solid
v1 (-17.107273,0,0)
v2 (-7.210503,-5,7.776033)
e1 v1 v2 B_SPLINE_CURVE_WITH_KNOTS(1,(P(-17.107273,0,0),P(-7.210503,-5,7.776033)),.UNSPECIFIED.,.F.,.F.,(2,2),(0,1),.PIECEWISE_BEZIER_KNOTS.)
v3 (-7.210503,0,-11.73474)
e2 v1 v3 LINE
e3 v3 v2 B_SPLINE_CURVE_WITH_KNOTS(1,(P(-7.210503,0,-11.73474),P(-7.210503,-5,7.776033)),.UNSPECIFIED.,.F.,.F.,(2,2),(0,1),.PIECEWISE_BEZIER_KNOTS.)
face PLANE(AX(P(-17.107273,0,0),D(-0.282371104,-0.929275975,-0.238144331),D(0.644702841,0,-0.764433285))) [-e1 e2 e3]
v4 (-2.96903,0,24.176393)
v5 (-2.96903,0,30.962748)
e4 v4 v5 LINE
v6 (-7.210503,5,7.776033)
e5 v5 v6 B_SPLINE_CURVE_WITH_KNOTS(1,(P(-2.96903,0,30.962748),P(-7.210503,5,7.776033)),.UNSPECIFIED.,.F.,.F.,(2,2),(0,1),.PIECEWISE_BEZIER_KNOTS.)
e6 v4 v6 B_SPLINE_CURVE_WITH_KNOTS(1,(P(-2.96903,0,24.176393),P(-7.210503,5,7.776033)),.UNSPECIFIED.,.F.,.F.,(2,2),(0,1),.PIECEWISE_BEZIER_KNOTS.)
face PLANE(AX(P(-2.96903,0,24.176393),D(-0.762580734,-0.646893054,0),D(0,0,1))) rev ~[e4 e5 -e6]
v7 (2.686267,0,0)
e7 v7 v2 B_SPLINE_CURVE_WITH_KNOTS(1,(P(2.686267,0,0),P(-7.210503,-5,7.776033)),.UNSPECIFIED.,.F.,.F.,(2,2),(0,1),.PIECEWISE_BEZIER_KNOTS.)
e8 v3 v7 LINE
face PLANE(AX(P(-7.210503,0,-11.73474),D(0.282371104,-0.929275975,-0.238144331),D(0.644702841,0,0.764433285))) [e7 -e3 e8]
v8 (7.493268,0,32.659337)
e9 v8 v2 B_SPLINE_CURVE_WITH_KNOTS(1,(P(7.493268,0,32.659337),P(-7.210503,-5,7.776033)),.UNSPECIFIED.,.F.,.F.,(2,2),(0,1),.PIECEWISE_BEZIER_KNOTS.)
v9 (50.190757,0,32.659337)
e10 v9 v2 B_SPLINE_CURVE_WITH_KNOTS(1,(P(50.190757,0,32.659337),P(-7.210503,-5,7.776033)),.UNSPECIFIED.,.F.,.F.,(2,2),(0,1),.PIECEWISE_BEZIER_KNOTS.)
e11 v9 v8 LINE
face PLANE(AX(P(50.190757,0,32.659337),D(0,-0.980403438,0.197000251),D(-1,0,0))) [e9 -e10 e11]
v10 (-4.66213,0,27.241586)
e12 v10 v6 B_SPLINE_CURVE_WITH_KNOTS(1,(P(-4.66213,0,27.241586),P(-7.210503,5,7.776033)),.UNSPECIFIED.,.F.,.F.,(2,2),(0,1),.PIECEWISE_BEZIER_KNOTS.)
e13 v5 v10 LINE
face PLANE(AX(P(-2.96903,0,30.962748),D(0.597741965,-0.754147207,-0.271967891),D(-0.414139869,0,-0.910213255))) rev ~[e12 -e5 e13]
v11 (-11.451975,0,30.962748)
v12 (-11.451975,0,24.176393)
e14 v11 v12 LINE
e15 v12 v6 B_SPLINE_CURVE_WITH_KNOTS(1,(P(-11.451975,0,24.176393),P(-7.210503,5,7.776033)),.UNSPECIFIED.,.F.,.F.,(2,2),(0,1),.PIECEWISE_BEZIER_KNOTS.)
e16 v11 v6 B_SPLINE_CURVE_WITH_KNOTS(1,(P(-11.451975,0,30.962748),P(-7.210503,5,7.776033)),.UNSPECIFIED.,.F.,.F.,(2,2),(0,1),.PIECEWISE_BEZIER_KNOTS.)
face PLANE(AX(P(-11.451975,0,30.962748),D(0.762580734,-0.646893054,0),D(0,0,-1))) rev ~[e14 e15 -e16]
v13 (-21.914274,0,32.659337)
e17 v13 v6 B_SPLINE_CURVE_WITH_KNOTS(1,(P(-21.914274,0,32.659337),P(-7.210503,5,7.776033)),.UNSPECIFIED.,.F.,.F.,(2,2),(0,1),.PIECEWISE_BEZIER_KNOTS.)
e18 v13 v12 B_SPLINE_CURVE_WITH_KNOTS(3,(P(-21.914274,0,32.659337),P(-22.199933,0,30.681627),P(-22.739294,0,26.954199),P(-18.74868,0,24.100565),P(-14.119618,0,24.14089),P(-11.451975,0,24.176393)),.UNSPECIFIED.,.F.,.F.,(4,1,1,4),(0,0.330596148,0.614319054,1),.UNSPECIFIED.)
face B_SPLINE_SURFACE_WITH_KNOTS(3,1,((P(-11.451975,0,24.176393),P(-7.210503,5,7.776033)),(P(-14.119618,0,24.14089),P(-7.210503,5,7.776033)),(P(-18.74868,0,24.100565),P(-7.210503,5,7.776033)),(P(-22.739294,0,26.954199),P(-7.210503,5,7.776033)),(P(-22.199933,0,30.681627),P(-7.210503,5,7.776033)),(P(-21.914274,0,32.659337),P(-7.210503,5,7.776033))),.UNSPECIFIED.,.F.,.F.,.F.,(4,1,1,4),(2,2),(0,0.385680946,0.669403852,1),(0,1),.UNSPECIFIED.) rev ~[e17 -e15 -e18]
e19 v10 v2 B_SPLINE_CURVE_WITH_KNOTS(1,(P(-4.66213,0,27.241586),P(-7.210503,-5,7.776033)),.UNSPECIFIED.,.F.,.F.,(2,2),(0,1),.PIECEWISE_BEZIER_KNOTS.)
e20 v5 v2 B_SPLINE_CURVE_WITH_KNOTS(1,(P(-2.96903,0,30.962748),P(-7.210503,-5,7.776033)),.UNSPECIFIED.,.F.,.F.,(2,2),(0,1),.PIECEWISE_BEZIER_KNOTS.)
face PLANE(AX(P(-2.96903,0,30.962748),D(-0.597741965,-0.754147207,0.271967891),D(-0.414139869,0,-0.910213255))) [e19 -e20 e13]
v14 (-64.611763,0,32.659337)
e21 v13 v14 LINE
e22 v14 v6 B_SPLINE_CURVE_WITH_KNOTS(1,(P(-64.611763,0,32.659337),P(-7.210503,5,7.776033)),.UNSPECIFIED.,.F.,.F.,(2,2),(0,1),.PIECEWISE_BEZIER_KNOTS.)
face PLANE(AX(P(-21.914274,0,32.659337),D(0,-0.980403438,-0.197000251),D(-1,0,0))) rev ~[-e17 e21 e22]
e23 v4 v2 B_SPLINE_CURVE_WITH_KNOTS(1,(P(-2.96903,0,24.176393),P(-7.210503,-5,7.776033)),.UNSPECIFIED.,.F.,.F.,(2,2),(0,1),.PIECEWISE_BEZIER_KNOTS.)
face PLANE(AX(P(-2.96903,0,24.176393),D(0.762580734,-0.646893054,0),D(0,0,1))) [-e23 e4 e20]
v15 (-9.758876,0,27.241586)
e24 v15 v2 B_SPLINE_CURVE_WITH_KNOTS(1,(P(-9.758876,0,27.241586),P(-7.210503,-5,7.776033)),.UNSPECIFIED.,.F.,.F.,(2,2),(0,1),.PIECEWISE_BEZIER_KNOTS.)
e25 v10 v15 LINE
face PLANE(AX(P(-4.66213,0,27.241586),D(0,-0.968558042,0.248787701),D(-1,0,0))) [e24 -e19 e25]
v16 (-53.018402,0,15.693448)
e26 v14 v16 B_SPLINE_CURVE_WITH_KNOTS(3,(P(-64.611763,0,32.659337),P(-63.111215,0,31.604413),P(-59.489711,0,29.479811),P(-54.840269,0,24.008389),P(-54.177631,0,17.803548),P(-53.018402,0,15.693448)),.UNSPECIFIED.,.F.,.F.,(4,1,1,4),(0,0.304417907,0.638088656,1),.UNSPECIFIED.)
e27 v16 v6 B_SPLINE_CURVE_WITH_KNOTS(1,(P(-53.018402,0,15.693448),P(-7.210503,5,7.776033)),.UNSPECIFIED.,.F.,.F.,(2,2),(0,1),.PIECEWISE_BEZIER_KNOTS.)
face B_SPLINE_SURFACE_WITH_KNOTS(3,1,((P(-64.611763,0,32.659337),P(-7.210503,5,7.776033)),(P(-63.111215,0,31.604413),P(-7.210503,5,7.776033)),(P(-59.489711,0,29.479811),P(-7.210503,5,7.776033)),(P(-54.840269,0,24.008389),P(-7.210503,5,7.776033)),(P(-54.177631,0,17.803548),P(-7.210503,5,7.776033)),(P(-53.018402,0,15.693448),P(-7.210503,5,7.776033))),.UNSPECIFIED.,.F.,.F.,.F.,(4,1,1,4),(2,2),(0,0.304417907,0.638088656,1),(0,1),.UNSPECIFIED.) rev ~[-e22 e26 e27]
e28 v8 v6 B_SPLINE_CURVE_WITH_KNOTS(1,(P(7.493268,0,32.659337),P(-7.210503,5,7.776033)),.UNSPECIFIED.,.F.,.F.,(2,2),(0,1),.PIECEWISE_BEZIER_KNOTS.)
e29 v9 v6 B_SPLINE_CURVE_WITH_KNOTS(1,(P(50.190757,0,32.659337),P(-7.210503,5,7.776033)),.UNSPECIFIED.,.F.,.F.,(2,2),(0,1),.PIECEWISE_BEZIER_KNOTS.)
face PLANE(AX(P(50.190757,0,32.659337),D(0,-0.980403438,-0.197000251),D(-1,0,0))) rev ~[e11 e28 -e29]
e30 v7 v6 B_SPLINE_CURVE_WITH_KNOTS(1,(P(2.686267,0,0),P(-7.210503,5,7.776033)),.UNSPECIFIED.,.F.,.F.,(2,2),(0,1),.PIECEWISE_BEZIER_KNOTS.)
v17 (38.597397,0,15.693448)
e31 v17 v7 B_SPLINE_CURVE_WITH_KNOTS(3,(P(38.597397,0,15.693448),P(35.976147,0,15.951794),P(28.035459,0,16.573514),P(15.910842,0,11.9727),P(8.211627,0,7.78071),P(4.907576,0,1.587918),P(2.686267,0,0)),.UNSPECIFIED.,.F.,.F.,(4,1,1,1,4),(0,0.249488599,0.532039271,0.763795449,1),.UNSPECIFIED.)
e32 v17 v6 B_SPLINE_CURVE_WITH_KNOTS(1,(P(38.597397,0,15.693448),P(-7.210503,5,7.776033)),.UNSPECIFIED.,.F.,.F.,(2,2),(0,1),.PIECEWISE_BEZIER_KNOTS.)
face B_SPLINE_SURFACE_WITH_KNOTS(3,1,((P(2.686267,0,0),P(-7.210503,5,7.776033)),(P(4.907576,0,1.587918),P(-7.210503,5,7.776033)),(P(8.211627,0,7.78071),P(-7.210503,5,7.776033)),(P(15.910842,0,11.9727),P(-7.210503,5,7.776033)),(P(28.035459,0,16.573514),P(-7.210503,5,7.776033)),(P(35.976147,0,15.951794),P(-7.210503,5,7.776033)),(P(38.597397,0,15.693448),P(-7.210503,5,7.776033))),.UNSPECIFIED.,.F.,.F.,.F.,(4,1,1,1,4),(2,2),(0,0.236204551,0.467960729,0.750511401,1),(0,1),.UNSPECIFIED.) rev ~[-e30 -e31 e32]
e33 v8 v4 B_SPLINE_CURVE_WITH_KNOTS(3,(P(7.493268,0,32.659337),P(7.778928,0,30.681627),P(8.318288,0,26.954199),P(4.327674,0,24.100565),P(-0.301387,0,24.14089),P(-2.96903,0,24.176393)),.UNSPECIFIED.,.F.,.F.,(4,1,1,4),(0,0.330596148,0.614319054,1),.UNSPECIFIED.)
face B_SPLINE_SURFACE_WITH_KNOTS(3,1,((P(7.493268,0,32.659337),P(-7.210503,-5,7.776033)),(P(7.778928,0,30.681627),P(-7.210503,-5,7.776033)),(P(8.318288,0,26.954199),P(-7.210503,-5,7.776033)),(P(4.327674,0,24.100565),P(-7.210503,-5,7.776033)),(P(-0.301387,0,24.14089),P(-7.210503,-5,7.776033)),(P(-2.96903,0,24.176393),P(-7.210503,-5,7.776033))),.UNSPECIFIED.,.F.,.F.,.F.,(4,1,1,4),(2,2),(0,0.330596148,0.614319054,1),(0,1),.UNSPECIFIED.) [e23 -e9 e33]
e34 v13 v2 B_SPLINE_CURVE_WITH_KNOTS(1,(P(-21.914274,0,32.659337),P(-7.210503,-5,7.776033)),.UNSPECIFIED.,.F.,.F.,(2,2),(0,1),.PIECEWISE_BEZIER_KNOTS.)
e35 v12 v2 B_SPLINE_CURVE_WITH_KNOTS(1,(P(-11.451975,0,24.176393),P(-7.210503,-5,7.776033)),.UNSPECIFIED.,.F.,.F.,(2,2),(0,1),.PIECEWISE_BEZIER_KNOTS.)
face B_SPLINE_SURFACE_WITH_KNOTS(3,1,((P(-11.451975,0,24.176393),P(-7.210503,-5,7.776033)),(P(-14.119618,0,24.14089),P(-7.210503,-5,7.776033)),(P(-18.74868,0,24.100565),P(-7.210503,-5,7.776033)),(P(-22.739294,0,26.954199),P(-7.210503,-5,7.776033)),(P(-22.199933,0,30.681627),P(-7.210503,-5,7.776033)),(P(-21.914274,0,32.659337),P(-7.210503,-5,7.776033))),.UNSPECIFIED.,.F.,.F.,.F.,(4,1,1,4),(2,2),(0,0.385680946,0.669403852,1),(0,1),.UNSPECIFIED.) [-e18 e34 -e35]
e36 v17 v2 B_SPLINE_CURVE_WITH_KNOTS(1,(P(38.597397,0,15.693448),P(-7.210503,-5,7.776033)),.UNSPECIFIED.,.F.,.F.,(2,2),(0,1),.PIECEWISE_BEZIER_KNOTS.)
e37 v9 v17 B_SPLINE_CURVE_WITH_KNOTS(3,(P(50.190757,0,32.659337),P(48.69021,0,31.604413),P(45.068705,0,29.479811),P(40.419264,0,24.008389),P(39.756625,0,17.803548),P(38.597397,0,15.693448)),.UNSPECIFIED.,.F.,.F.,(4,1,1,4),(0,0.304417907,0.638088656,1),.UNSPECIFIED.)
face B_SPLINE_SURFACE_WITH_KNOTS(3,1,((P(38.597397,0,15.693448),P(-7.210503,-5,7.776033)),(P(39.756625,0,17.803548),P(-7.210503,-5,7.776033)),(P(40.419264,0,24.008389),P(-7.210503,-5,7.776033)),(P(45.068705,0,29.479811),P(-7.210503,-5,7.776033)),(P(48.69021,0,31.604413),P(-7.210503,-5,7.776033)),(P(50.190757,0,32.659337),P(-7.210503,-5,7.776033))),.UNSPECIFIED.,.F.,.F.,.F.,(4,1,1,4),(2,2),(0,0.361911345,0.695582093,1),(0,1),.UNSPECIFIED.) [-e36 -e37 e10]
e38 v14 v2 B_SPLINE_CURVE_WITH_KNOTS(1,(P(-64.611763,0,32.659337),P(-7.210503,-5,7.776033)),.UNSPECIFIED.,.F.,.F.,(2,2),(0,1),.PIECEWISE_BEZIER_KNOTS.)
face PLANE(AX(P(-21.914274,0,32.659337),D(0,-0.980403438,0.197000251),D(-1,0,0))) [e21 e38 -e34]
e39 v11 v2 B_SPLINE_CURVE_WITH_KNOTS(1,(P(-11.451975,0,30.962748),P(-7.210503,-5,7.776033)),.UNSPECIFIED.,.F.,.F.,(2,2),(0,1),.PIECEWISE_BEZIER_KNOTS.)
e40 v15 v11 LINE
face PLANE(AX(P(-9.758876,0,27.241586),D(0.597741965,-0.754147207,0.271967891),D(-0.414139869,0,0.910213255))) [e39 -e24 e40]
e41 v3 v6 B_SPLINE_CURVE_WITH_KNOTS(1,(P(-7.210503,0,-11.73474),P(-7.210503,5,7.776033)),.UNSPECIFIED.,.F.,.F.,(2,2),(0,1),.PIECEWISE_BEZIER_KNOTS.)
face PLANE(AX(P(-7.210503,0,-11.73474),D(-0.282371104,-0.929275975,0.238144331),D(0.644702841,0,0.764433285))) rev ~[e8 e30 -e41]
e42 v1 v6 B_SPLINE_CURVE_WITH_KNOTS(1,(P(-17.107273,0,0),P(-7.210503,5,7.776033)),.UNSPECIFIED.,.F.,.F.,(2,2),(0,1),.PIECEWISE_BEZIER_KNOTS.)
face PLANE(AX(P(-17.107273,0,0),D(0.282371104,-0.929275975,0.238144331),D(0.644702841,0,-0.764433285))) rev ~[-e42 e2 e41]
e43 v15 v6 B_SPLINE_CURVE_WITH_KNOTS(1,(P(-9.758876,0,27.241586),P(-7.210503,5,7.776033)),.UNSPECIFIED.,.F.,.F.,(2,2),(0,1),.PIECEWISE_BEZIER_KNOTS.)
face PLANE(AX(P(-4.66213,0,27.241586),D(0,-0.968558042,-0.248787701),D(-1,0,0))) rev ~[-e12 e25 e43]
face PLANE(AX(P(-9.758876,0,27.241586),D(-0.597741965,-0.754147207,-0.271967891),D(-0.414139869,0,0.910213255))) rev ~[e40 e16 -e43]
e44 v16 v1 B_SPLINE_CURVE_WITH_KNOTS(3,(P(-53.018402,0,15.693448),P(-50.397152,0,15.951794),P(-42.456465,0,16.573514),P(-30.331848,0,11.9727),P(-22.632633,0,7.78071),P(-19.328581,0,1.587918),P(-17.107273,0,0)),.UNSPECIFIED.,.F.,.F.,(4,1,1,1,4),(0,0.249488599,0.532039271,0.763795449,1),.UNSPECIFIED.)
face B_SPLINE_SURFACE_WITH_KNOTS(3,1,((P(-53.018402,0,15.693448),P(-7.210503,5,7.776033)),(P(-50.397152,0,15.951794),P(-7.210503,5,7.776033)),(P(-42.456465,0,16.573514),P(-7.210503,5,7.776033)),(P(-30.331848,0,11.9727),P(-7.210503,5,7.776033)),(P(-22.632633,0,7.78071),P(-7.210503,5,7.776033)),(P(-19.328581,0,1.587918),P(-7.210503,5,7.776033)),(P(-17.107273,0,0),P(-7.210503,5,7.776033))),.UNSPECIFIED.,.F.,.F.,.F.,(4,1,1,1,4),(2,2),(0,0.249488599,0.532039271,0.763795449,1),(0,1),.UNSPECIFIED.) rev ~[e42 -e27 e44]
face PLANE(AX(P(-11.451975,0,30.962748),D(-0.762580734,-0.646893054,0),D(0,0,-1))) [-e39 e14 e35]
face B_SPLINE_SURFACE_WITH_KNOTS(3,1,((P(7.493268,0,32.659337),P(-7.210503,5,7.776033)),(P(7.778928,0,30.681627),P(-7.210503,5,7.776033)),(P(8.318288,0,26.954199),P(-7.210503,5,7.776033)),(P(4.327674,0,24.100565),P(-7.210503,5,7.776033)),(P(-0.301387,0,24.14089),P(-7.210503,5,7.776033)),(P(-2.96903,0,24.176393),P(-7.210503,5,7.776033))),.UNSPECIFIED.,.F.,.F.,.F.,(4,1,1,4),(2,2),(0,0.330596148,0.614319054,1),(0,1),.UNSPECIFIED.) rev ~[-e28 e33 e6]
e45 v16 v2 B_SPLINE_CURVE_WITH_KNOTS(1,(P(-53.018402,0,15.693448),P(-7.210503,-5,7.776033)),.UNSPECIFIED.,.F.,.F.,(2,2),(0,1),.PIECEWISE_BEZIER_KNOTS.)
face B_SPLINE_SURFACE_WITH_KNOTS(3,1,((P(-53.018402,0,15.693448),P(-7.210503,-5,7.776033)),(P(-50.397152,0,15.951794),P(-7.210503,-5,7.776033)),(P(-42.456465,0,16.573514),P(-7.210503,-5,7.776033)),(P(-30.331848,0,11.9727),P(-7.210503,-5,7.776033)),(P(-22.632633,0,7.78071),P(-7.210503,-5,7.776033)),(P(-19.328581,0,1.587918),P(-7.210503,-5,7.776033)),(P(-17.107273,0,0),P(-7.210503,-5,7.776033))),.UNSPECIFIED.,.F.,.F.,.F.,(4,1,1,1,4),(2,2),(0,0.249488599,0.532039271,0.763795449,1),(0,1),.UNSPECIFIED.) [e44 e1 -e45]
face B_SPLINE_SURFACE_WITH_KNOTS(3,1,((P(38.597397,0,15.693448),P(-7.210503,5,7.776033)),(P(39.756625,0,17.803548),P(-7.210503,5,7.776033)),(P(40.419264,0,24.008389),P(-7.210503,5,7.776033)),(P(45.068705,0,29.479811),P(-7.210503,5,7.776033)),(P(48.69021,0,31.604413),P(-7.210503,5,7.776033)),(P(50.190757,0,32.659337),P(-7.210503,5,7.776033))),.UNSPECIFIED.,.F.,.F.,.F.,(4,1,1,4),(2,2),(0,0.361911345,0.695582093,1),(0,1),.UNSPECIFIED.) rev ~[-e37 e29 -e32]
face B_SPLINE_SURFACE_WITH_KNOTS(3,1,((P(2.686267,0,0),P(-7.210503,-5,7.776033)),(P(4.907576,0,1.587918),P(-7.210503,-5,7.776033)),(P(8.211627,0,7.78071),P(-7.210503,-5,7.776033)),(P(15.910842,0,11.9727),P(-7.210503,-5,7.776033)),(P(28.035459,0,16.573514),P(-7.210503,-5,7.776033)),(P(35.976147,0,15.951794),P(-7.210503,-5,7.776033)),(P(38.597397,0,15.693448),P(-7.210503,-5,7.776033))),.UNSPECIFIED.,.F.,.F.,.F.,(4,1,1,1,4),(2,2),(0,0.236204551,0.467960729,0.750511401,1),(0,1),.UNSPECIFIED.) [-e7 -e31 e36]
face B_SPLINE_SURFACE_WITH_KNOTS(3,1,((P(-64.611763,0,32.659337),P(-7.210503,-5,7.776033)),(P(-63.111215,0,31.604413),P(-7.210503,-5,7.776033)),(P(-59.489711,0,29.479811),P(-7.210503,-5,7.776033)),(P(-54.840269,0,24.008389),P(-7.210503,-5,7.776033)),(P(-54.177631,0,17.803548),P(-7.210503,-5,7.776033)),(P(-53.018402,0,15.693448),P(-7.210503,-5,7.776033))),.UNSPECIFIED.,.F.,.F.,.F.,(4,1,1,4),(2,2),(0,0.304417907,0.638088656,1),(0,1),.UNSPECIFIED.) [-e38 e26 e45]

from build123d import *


with BuildPart() as f3:
    # F0 (on Front) → F3 section 0
    with BuildSketch(Plane.XZ, mode=Mode.PRIVATE) as f3_s0:
        with BuildLine():
            Line((-21.9142735004, 32.6593369246), (-64.6117627621, 32.6593369246))
            add(Edge.make_bspline(
                [(-64.6117627621, 32.6593369246), (-63.1112154786, 31.6044133494), (-59.4897111338, 29.4798106269), (-54.8402694545, 24.0083886157), (-54.1776311477, 17.803548493), (-53.0184023082, 15.6934484839)],
                knots=[0, 0, 0, 0, 0.3044179075, 0.6380886555, 1, 1, 1, 1], degree=3))
            add(Edge.make_bspline(
                [(-53.0184023082, 15.6934484839), (-50.397152359, 15.9517944961), (-42.4564652069, 16.5735141568), (-30.3318480055, 11.9726995365), (-22.6326325716, 7.7807102957), (-19.3285813991, 1.5879180834), (-17.1072725207, 0)],
                knots=[0, 0, 0, 0, 0.2494885994, 0.5320392712, 0.7637954486, 1, 1, 1, 1], degree=3))
            Line((-17.1072725207, 0), (-7.2105028667, -11.7347398773))
            Line((-7.2105028667, -11.7347398773), (2.6862667874, 0))
            add(Edge.make_bspline(
                [(38.5973965749, 15.6934484839), (35.9761466257, 15.9517944961), (28.0354594736, 16.5735141568), (15.9108422722, 11.9726995365), (8.2116268383, 7.7807102957), (4.9075756658, 1.5879180834), (2.6862667874, 0)],
                knots=[0, 0, 0, 0, 0.2494885994, 0.5320392712, 0.7637954486, 1, 1, 1, 1], degree=3))
            add(Edge.make_bspline(
                [(50.1907570288, 32.6593369246), (48.6902097453, 31.6044133494), (45.0687054005, 29.4798106269), (40.4192637212, 24.0083886157), (39.7566254144, 17.803548493), (38.5973965749, 15.6934484839)],
                knots=[0, 0, 0, 0, 0.3044179075, 0.6380886555, 1, 1, 1, 1], degree=3))
            Line((50.1907570288, 32.6593369246), (7.4932677671, 32.6593369246))
            add(Edge.make_bspline(
                [(7.4932677671, 32.6593369246), (7.7789275206, 30.681626577), (8.3182882425, 26.9541985329), (4.3276740221, 24.1005648406), (-0.3013873529, 24.1408897918), (-2.9690302908, 24.1763927042)],
                knots=[0, 0, 0, 0, 0.3305961482, 0.6143190537, 1, 1, 1, 1], degree=3))
            Line((-2.9690302908, 24.1763927042), (-2.9690302908, 30.962748453))
            Line((-2.9690302908, 30.962748453), (-4.662130028, 27.2415857762))
            Line((-4.662130028, 27.2415857762), (-7.2105028667, 27.2415857762))
            Line((-7.2105028667, 27.2415857762), (-9.7588757053, 27.2415857762))
            Line((-9.7588757053, 27.2415857762), (-11.4519754425, 30.962748453))
            Line((-11.4519754425, 30.962748453), (-11.4519754425, 24.1763927042))
            add(Edge.make_bspline(
                [(-21.9142735004, 32.6593369246), (-22.199933254, 30.681626577), (-22.7392939758, 26.9541985329), (-18.7486797554, 24.1005648406), (-14.1196183804, 24.1408897918), (-11.4519754425, 24.1763927042)],
                knots=[0, 0, 0, 0, 0.3305961482, 0.6143190537, 1, 1, 1, 1], degree=3))
        make_face()
    loft([f3_s0.sketch, Vertex(-7.2105028667, -5, 7.7760326676)])

    # F0 (on Front) → F6 section 0
    with BuildSketch(Plane.XZ, mode=Mode.PRIVATE) as f6_s0:
        with BuildLine():
            Line((-21.9142735004, 32.6593369246), (-64.6117627621, 32.6593369246))
            add(Edge.make_bspline(
                [(-64.6117627621, 32.6593369246), (-63.1112154786, 31.6044133494), (-59.4897111338, 29.4798106269), (-54.8402694545, 24.0083886157), (-54.1776311477, 17.803548493), (-53.0184023082, 15.6934484839)],
                knots=[0, 0, 0, 0, 0.3044179075, 0.6380886555, 1, 1, 1, 1], degree=3))
            add(Edge.make_bspline(
                [(-53.0184023082, 15.6934484839), (-50.397152359, 15.9517944961), (-42.4564652069, 16.5735141568), (-30.3318480055, 11.9726995365), (-22.6326325716, 7.7807102957), (-19.3285813991, 1.5879180834), (-17.1072725207, 0)],
                knots=[0, 0, 0, 0, 0.2494885994, 0.5320392712, 0.7637954486, 1, 1, 1, 1], degree=3))
            Line((-17.1072725207, 0), (-7.2105028667, -11.7347398773))
            Line((-7.2105028667, -11.7347398773), (2.6862667874, 0))
            add(Edge.make_bspline(
                [(38.5973965749, 15.6934484839), (35.9761466257, 15.9517944961), (28.0354594736, 16.5735141568), (15.9108422722, 11.9726995365), (8.2116268383, 7.7807102957), (4.9075756658, 1.5879180834), (2.6862667874, 0)],
                knots=[0, 0, 0, 0, 0.2494885994, 0.5320392712, 0.7637954486, 1, 1, 1, 1], degree=3))
            add(Edge.make_bspline(
                [(50.1907570288, 32.6593369246), (48.6902097453, 31.6044133494), (45.0687054005, 29.4798106269), (40.4192637212, 24.0083886157), (39.7566254144, 17.803548493), (38.5973965749, 15.6934484839)],
                knots=[0, 0, 0, 0, 0.3044179075, 0.6380886555, 1, 1, 1, 1], degree=3))
            Line((50.1907570288, 32.6593369246), (7.4932677671, 32.6593369246))
            add(Edge.make_bspline(
                [(7.4932677671, 32.6593369246), (7.7789275206, 30.681626577), (8.3182882425, 26.9541985329), (4.3276740221, 24.1005648406), (-0.3013873529, 24.1408897918), (-2.9690302908, 24.1763927042)],
                knots=[0, 0, 0, 0, 0.3305961482, 0.6143190537, 1, 1, 1, 1], degree=3))
            Line((-2.9690302908, 24.1763927042), (-2.9690302908, 30.962748453))
            Line((-2.9690302908, 30.962748453), (-4.662130028, 27.2415857762))
            Line((-4.662130028, 27.2415857762), (-7.2105028667, 27.2415857762))
            Line((-7.2105028667, 27.2415857762), (-9.7588757053, 27.2415857762))
            Line((-9.7588757053, 27.2415857762), (-11.4519754425, 30.962748453))
            Line((-11.4519754425, 30.962748453), (-11.4519754425, 24.1763927042))
            add(Edge.make_bspline(
                [(-21.9142735004, 32.6593369246), (-22.199933254, 30.681626577), (-22.7392939758, 26.9541985329), (-18.7486797554, 24.1005648406), (-14.1196183804, 24.1408897918), (-11.4519754425, 24.1763927042)],
                knots=[0, 0, 0, 0, 0.3305961482, 0.6143190537, 1, 1, 1, 1], degree=3))
        make_face()
    loft([f6_s0.sketch, Vertex(-7.2105028667, 5, 7.7760326676)])


solid = f3.part
